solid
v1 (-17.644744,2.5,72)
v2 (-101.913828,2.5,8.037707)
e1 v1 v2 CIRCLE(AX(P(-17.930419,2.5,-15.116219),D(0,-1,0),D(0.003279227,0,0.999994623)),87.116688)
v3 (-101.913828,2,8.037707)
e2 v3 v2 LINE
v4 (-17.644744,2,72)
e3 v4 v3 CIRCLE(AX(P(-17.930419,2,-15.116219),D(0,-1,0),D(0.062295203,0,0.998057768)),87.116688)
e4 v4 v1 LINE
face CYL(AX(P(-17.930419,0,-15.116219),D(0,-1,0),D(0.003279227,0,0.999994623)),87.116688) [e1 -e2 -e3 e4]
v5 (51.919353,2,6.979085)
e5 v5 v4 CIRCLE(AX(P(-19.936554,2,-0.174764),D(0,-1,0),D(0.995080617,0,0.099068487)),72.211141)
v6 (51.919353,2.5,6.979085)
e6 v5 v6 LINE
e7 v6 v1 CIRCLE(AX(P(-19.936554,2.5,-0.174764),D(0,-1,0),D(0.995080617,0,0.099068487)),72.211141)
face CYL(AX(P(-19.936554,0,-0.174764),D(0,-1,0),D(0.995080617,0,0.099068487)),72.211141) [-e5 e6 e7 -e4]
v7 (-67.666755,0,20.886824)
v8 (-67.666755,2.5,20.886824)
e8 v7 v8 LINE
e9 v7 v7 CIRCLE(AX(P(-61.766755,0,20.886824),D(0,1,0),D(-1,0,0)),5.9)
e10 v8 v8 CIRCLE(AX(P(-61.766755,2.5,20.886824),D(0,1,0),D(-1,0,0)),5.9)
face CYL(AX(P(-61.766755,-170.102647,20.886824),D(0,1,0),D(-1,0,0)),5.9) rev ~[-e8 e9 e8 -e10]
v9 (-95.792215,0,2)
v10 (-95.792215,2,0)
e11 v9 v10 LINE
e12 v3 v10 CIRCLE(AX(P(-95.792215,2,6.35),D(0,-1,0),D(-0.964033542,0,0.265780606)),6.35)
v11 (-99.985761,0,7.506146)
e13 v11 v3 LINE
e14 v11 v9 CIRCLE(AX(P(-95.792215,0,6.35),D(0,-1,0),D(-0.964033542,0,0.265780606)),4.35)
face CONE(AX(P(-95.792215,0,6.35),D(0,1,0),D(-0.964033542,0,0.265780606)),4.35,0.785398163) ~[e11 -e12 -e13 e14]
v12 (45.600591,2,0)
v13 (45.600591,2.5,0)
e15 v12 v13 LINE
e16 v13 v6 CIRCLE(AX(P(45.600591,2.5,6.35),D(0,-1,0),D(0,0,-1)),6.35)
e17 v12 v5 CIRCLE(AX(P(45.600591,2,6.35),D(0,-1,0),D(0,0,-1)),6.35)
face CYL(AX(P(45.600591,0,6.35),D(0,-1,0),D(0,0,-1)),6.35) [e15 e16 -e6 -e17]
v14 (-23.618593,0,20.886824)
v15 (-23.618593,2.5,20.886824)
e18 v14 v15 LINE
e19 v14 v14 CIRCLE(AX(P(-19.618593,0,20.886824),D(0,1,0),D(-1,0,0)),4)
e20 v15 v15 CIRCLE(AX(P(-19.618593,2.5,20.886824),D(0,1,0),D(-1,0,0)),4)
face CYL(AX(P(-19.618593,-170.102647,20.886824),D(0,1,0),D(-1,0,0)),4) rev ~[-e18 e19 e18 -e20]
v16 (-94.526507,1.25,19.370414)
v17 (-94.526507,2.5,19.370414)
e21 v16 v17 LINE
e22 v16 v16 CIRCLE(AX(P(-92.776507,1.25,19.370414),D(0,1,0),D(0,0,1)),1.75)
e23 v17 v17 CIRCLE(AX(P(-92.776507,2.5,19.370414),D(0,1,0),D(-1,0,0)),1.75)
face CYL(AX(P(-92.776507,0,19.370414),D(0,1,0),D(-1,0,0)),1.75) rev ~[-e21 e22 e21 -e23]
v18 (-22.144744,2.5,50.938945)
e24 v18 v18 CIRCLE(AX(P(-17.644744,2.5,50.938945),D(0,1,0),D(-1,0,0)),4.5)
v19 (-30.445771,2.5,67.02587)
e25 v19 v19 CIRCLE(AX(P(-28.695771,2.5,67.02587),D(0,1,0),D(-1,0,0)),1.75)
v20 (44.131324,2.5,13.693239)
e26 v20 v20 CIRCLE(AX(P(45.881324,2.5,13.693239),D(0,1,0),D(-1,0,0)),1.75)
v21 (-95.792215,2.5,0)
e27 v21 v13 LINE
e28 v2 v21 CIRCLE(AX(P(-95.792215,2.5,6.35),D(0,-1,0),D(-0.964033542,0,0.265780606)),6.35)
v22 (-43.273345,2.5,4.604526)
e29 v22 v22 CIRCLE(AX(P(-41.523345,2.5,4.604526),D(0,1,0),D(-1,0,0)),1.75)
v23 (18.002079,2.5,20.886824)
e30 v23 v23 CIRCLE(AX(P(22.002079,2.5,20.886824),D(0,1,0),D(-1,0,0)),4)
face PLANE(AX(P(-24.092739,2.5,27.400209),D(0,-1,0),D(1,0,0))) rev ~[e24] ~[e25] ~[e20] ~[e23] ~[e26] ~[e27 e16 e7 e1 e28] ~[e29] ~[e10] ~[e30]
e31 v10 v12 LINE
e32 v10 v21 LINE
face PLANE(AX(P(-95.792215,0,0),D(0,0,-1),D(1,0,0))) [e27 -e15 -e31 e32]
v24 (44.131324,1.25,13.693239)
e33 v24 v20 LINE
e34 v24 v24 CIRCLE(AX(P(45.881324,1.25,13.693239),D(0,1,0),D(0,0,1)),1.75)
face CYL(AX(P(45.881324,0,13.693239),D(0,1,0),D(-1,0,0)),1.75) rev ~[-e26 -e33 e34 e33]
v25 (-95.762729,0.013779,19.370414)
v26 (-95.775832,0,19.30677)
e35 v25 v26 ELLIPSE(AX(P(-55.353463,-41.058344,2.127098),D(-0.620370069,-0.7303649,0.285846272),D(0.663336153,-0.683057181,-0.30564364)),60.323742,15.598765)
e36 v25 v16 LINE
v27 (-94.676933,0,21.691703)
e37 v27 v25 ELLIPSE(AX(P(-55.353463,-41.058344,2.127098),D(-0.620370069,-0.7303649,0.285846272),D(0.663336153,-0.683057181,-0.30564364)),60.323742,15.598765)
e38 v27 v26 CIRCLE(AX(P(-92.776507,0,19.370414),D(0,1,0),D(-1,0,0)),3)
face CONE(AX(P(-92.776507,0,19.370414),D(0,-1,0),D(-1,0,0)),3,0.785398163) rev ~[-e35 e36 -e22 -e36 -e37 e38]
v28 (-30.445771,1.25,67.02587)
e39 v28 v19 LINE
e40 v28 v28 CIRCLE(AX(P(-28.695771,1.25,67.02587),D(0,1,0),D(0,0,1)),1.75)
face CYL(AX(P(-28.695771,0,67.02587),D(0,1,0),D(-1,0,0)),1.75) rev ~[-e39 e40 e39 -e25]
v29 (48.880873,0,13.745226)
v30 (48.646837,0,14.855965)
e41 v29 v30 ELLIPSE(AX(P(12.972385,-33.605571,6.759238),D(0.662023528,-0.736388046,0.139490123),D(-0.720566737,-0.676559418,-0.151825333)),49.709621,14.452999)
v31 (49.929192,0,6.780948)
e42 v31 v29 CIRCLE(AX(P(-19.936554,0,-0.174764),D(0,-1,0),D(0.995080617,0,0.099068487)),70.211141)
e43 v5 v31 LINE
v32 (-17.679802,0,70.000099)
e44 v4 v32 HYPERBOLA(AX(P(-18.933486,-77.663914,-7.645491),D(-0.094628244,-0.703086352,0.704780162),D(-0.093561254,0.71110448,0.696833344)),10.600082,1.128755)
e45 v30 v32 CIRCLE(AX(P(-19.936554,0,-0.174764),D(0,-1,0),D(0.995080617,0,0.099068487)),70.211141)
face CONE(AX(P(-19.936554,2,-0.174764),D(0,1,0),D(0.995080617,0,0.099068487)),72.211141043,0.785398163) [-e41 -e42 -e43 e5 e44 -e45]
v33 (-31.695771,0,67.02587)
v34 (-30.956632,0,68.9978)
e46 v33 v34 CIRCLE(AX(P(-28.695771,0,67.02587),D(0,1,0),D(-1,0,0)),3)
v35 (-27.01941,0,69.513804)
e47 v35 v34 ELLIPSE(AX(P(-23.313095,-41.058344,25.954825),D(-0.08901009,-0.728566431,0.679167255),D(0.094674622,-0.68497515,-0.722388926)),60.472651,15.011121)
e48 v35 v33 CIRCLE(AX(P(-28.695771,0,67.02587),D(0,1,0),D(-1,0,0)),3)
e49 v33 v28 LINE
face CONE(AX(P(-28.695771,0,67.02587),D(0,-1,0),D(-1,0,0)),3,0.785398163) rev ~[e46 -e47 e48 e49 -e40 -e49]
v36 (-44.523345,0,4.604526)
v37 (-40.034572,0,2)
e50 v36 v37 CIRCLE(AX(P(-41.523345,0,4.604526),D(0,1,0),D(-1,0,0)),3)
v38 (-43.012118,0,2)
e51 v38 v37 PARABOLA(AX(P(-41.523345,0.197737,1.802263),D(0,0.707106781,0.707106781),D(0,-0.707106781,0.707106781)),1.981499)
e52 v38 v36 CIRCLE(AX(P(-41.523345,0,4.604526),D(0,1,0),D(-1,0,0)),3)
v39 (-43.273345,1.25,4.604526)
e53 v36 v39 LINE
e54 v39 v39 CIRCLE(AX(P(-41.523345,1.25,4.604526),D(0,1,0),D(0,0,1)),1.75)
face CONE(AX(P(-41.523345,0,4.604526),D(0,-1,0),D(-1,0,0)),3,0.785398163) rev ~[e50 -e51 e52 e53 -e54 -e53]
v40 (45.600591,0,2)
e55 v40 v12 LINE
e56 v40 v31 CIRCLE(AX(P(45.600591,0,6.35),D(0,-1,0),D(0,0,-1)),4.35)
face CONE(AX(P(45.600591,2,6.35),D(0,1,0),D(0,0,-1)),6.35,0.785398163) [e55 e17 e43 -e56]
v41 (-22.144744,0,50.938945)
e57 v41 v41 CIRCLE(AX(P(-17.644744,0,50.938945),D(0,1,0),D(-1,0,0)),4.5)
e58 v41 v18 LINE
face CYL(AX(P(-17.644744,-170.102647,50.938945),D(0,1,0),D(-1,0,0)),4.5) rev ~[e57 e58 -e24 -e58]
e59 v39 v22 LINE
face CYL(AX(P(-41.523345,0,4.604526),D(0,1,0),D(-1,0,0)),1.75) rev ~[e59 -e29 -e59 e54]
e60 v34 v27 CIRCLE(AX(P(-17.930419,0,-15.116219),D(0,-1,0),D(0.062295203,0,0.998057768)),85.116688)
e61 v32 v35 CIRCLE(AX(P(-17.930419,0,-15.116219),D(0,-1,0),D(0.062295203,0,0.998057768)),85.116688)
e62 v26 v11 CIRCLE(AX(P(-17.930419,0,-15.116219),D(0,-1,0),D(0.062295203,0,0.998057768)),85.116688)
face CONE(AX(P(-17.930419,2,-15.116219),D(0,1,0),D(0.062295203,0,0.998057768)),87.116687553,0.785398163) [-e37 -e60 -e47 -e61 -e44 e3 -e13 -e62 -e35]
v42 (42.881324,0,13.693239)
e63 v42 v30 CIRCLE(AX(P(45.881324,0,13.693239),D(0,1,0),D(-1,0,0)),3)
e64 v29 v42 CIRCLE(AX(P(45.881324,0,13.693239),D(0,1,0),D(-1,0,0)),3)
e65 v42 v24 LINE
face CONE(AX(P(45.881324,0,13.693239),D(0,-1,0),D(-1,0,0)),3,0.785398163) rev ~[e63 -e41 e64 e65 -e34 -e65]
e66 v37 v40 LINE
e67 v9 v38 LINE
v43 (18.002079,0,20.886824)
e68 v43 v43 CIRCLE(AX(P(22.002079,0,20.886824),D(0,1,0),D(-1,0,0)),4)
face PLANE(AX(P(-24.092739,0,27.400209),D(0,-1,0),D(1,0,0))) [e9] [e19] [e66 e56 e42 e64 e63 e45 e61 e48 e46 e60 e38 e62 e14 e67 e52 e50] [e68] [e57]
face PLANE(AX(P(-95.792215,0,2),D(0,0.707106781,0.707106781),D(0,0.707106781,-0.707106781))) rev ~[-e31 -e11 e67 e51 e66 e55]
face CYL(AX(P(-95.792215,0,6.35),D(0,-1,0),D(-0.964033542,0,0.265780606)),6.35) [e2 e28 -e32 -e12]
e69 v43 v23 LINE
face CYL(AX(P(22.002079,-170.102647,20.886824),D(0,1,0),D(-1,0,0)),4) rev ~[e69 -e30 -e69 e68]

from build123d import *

# Parameters (mm, degrees)
F1_DEPTH       = 2.5
F2_D           = 3.5
F2_CSINK_D     = 6
F2_CSINK_ANGLE = 90
F3_T1_DEPTH    = 141.3928063628
F3_T4_ANGLE    = 86.5781008802
F3_T6_ANGLE    = 95.6855323437
F3_T8_ANGLE    = 105.4133416791
F3_T10_ANGLE   = 78.1582231343
F4_D           = 11.8
F5_D           = 8
F6_D           = 9


# Not quite as in the source:
# - a fillet or chamfer that OpenCascade refuses, or shapes differently, is made with other operations: its cross-section is extruded or revolved along the edge and cut away or added


with BuildPart() as f1:
    # F0 (on Front) → F1 (new body)
    with BuildSketch(Plane.XZ):
        with BuildLine():
            ThreePointArc((51.9193532242, 6.9790848915), (29.3726830737, 52.5798387856), (-17.6447437911, 72))
            ThreePointArc((-17.6447437911, 72), (-70.6003478325, 54.2753932247), (-101.9138280482, 8.0377068475))
            ThreePointArc((-101.9138280482, 8.0377068475), (-100.843919646, 2.5025617927), (-95.7922150584, 0))
            Line((-95.7922150584, 0), (45.6005913044, 0))
            ThreePointArc((45.6005913044, 0), (50.3078829387, 2.0880866422), (51.9193532242, 6.9790848915))
        make_face()
    extrude(amount=-F1_DEPTH)

    # F2 (through all)
    with Locations(Plane.XZ):
        with Locations((-92.7765071392, 19.3704143167), (-28.6957714707, 67.0258700848), (45.8813235164, 13.6932386085), (-41.5233448148, 4.6045258641)):
            CounterSinkHole(F2_D / 2, F2_CSINK_D / 2, counter_sink_angle=F2_CSINK_ANGLE)

    # F3: chamfer of 2 on 1 edges, made by hand

    # F3_s2 → F3_t1 (cut)
    with BuildSketch(Plane.YZ.offset(-95.7922150584)):
        Polygon((0, 2), (2, 0), (0, 0), align=None)
    extrude(amount=F3_T1_DEPTH, mode=Mode.SUBTRACT)

    # F3_s3 → F3_t4 (revolve, cut)
    with BuildSketch(Plane(origin=(-0.1784402108, 0, 1.7923196444), x_dir=(0, 1, 0), z_dir=(0.0990684869, 0, -0.9950806173))):
        Polygon((2, 52.3553494356), (0, 50.3553494356), (0, 52.3553494356), align=None)
    revolve(axis=Axis((-19.9365535802, 0, -0.1747635854), (0, -1, 0)), revolution_arc=F3_T4_ANGLE, mode=Mode.SUBTRACT)

    # F3_s5 → F3_t6 (revolve, cut)
    with BuildSketch(Plane.YZ.offset(45.6005913044)):
        Polygon((2, 0), (0, 2), (0, 0), align=None)
    revolve(axis=Axis((45.6005913044, 0, 6.35), (0, -1, 0)), revolution_arc=F3_T6_ANGLE, mode=Mode.SUBTRACT)

    # F3_s7 → F3_t8 (revolve, cut)
    with BuildSketch(Plane(origin=(-5.1396919269, 0, -18.6425770032), x_dir=(0, 1, 0), z_dir=(0.2657806059, 0, 0.9640335417))):
        Polygon((0, 98.3846151976), (2, 100.3846151976), (0, 100.3846151976), align=None)
    revolve(axis=Axis((-95.7922150584, 0, 6.35), (0, -1, 0)), revolution_arc=F3_T8_ANGLE, mode=Mode.SUBTRACT)

    # F3_s9 → F3_t10 (revolve, cut)
    with BuildSketch(Plane(origin=(-16.9209977533, 0, 1.0561482837), x_dir=(0, 1, 0), z_dir=(0.9980577677, 0, -0.0622952035))):
        Polygon((2, 70.9128484948), (0, 68.9128484948), (0, 70.9128484948), align=None)
    revolve(axis=Axis((-17.9304192048, 0, -15.1162191548), (0, -1, 0)), revolution_arc=F3_T10_ANGLE, mode=Mode.SUBTRACT)

    # F4 (through all)
    with Locations(Plane.XZ):
        with Locations((-61.7667548358, 20.886823535)):
            Hole(F4_D / 2)

    # F5 (through all)
    with Locations(Plane.XZ):
        with Locations((-19.6185931563, 20.886823535), (22.0020785928, 20.886823535)):
            Hole(F5_D / 2)

    # F6 (through all)
    with Locations(Plane.XZ):
        with Locations((-17.6447437911, 50.9389452636)):
            Hole(F6_D / 2)


solid = f1.part
